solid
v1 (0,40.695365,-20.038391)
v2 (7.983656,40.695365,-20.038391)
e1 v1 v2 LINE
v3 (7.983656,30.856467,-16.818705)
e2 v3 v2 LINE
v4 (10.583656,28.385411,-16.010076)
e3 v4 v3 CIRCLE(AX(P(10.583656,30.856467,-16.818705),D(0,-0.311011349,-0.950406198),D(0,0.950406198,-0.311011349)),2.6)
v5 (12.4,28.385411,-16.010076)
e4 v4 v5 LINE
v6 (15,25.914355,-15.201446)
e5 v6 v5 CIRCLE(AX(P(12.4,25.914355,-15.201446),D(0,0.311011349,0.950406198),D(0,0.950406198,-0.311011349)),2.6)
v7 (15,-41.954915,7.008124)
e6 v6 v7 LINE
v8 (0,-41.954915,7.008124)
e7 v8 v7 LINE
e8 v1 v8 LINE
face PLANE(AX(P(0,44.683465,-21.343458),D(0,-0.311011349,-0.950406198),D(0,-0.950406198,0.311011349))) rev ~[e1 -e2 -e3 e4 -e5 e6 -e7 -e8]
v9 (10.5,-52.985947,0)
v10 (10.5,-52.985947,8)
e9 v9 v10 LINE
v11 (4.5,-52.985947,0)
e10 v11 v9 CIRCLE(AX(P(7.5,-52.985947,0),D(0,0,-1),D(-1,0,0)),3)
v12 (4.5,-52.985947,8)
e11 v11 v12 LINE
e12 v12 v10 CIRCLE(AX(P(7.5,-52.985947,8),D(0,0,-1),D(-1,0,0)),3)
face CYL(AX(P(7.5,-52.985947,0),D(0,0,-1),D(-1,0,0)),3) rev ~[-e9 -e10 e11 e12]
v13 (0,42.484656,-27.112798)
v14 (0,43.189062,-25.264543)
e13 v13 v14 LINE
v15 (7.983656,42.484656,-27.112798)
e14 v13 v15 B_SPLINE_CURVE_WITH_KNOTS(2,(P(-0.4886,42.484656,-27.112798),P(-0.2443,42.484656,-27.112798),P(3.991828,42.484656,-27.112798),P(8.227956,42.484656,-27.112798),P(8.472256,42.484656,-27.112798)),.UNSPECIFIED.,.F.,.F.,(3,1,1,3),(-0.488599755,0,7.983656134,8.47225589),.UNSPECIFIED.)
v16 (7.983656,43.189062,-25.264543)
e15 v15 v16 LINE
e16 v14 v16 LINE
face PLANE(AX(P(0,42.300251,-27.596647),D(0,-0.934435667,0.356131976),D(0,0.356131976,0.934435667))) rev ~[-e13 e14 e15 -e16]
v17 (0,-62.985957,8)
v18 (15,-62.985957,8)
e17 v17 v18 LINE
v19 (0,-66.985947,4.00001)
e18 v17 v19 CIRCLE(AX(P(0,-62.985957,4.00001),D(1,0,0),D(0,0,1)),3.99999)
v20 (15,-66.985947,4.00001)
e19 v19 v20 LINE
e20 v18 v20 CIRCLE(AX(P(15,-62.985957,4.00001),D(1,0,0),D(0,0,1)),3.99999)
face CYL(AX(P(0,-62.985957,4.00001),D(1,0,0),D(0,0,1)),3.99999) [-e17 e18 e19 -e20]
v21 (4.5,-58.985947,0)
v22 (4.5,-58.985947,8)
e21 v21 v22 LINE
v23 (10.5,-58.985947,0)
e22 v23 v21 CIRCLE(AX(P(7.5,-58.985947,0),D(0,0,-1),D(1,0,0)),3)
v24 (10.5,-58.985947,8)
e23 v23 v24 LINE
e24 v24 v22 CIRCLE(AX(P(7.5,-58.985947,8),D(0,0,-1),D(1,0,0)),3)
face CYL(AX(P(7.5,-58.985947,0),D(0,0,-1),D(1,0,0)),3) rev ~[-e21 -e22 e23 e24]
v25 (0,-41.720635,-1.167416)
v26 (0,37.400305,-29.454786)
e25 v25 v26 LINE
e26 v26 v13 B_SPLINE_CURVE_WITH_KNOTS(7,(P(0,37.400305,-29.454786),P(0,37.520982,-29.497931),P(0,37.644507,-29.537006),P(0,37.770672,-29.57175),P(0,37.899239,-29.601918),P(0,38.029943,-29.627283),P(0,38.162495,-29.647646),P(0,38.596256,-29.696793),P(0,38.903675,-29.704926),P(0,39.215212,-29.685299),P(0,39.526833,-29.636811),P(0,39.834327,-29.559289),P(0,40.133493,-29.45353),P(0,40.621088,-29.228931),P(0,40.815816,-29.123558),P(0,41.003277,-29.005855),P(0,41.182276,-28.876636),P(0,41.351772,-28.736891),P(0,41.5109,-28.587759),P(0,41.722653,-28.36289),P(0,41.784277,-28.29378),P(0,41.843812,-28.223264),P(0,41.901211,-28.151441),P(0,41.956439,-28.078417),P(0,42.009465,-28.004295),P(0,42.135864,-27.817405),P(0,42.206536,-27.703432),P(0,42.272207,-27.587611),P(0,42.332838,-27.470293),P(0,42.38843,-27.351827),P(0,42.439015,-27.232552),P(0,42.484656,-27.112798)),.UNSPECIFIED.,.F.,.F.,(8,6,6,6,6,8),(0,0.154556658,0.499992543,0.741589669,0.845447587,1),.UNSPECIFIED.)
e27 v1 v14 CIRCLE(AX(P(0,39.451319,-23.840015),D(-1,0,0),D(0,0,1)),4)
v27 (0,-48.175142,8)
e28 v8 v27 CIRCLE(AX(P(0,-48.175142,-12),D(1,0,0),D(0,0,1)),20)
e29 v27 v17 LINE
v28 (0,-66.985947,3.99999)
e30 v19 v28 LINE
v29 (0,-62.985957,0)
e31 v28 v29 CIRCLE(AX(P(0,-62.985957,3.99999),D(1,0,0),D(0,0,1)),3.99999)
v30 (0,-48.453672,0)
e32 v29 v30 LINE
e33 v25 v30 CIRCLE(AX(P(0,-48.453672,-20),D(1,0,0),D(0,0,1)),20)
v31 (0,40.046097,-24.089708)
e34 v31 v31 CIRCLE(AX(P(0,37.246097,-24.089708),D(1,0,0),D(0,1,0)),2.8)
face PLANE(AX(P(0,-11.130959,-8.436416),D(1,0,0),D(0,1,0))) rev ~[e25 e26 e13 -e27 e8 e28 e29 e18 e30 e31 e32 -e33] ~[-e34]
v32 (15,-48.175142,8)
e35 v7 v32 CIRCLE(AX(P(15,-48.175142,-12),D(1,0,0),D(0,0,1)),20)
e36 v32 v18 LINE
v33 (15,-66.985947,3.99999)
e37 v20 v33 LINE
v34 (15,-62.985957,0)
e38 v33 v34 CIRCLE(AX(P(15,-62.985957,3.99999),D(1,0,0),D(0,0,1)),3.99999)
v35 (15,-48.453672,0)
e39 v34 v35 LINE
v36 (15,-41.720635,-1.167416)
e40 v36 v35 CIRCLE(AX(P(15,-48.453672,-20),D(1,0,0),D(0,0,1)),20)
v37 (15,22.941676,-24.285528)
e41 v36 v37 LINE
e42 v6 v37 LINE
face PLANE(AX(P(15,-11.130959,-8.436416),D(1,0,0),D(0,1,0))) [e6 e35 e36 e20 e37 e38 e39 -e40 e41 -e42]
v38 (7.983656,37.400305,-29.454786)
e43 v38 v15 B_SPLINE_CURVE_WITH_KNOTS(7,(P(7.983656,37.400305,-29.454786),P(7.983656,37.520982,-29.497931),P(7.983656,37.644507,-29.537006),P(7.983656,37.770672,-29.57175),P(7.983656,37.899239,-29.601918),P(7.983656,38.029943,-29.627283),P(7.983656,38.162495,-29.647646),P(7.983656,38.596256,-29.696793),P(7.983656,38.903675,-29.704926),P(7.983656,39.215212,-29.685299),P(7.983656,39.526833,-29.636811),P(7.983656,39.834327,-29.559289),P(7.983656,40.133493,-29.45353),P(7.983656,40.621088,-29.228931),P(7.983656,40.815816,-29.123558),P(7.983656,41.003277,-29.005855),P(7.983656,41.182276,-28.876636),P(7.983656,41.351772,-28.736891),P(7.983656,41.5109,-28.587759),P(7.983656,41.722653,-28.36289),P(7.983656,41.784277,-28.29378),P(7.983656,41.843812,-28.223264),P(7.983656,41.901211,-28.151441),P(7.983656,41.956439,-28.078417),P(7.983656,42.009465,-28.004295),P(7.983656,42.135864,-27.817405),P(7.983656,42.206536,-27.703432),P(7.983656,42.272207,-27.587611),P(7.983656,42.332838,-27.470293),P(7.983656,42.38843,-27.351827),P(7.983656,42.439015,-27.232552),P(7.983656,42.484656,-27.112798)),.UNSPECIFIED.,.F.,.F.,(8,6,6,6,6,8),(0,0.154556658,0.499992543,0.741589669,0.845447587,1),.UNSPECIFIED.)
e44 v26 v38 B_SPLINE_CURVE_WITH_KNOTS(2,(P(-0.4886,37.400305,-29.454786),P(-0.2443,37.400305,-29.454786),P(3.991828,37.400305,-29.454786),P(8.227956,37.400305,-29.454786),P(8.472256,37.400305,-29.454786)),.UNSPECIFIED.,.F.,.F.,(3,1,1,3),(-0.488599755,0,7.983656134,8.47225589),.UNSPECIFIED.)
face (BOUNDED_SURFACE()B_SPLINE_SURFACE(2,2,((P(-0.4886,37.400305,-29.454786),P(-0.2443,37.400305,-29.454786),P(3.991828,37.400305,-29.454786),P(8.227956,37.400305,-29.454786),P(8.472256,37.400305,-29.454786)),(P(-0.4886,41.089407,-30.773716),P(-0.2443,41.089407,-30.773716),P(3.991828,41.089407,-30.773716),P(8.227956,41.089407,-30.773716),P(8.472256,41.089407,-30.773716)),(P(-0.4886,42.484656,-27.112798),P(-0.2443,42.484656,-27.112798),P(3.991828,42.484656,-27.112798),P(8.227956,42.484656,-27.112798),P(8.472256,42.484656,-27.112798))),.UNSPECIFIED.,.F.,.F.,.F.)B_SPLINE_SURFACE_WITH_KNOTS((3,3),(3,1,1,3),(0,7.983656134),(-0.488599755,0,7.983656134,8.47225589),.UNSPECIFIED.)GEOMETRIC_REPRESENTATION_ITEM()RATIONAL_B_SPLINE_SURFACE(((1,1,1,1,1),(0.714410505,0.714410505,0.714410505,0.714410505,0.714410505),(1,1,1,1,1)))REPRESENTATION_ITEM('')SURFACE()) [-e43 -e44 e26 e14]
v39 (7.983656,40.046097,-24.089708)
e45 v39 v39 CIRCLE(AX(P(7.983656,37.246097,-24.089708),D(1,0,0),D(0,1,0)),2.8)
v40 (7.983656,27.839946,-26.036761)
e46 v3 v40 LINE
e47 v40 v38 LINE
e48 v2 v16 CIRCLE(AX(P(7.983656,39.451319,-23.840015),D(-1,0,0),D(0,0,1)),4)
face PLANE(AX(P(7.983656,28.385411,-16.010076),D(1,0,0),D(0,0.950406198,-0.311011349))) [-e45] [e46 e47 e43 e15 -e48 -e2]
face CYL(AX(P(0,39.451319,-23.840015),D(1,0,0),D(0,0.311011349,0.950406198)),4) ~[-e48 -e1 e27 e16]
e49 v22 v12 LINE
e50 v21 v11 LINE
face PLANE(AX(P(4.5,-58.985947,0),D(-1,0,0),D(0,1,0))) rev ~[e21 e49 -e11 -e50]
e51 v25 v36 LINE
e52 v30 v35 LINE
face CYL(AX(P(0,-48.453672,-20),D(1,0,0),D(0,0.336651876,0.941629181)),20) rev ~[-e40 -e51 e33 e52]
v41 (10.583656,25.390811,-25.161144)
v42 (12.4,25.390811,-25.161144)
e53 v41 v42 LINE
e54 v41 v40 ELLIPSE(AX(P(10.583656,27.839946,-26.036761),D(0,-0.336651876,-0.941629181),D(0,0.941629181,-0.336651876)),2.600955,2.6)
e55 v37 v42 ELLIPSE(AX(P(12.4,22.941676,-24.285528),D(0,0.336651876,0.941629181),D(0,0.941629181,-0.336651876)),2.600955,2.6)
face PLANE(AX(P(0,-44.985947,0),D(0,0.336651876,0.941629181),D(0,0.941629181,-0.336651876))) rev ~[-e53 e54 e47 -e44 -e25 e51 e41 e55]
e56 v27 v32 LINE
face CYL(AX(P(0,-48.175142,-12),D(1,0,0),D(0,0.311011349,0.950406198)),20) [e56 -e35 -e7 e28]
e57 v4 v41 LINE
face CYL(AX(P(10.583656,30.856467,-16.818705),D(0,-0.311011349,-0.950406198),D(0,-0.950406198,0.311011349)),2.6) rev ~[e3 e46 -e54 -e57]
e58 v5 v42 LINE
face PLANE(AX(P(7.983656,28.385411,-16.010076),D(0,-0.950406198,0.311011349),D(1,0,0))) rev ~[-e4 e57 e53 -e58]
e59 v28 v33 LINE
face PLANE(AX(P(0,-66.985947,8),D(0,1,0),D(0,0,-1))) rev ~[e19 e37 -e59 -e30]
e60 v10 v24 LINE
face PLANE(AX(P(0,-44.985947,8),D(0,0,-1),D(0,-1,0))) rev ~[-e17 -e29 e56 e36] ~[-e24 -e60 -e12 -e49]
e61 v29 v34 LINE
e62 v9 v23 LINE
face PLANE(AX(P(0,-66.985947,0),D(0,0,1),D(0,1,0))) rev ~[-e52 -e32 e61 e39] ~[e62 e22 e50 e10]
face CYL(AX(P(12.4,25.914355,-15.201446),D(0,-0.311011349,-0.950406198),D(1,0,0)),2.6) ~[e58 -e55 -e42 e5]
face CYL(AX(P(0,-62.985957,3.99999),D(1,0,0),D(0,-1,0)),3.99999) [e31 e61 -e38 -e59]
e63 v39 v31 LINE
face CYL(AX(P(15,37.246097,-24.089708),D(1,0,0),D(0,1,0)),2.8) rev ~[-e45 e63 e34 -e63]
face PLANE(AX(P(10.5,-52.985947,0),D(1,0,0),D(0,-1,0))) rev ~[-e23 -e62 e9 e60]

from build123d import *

# Parameters (mm, degrees)
F1_DEPTH = 15
F3_DEPTH = 25
F4_R     = 3.99999
F5_W     = 7.0163438655
F5_H     = 17.1485144225
F6_DEPTH = 25
F7_R     = 2.6
F8_R     = 2.8
F9_DEPTH = 25
F10_R    = 20
F11_R    = 4


# Not quite as in the source:
# - a fillet or chamfer is up to 0.001 mm smaller than in the source, because OpenCascade refuses the exact size


with BuildPart() as f1:
    # F0 (on Right) → F1 (new body)
    with BuildSketch(Plane.YZ):
        Polygon((-44.9859467229, 8), (-66.9859467229, 8), (-66.9859467229, 0), (-44.9859467229, 0), (41.0894067598, -30.7737162478), (42.3002508738, -27.5966470596), (43.3758810707, -24.7743584453), (44.6834651639, -21.3434583933), align=None)
    extrude(amount=F1_DEPTH)

    # F2 (on face) → F3 (cut)
    with BuildSketch(Plane(origin=(0, 0, 0), x_dir=(1, 0, 0), z_dir=(0, 0, -1))):
        with BuildLine():
            Line((4.5, 58.9859467229), (4.5, 52.9859467229))
            ThreePointArc((4.5, 52.9859467229), (7.5, 49.9859467229), (10.5, 52.9859467229))
            Line((10.5, 52.9859467229), (10.5, 58.9859467229))
            ThreePointArc((10.5, 58.9859467229), (7.5, 61.9859467229), (4.5, 58.9859467229))
        make_face()
    extrude(amount=-F3_DEPTH, mode=Mode.SUBTRACT)

    # F4 (radius 4 in the source; OpenCascade refuses exactly that, so slightly less here)
    f4_edges = [f1.edges().sort_by_distance(p)[0] for p in [
        (7.5, -66.985947, 0),
        (7.5, -66.985947, 8),
    ]]
    fillet(f4_edges, radius=F4_R)

    # F5 (on face) → F6 (cut)
    with BuildSketch(Plane(origin=(0, -1.9867064016, -6.0710906068), x_dir=(1, 0, 0), z_dir=(0, 0.3110113487, 0.9504061979))):
        with Locations((11.4918280672, 40.5312428041)):
            Rectangle(F5_W, F5_H)
        Polygon((15, 49.1055000154), (15, 31.9569855928), (21.9836561345, 31.9569855928), (21.9836561345, 65.9569855928), (7.9836561345, 65.9569855928), (7.9836561345, 49.1055000154), align=None)
    extrude(amount=-F6_DEPTH, mode=Mode.SUBTRACT)

    # F7
    f7_edges = [f1.edges().sort_by_distance(p)[0] for p in [
        (7.983656, 26.888111, -20.58561),
        (15, 26.888111, -20.58561),
    ]]
    fillet(f7_edges, radius=F7_R)

    # F8 (on face) → F9 (cut)
    with BuildSketch(Plane.YZ.offset(15)):
        with Locations((37.2460966017, -24.0897076146)):
            Circle(F8_R)
    extrude(amount=-F9_DEPTH, mode=Mode.SUBTRACT)

    # F10
    f10_edges = [f1.edges().sort_by_distance(p)[0] for p in [
        (7.5, -44.985947, 8),
        (7.5, -44.985947, 0),
    ]]
    fillet(f10_edges, radius=F10_R)

    # F11
    f11_edges = [f1.edges().sort_by_distance(p)[0] for p in [
        (3.991828, 41.089407, -30.773716),
        (3.991828, 44.683465, -21.343458),
    ]]
    fillet(f11_edges, radius=F11_R)


solid = f1.part
